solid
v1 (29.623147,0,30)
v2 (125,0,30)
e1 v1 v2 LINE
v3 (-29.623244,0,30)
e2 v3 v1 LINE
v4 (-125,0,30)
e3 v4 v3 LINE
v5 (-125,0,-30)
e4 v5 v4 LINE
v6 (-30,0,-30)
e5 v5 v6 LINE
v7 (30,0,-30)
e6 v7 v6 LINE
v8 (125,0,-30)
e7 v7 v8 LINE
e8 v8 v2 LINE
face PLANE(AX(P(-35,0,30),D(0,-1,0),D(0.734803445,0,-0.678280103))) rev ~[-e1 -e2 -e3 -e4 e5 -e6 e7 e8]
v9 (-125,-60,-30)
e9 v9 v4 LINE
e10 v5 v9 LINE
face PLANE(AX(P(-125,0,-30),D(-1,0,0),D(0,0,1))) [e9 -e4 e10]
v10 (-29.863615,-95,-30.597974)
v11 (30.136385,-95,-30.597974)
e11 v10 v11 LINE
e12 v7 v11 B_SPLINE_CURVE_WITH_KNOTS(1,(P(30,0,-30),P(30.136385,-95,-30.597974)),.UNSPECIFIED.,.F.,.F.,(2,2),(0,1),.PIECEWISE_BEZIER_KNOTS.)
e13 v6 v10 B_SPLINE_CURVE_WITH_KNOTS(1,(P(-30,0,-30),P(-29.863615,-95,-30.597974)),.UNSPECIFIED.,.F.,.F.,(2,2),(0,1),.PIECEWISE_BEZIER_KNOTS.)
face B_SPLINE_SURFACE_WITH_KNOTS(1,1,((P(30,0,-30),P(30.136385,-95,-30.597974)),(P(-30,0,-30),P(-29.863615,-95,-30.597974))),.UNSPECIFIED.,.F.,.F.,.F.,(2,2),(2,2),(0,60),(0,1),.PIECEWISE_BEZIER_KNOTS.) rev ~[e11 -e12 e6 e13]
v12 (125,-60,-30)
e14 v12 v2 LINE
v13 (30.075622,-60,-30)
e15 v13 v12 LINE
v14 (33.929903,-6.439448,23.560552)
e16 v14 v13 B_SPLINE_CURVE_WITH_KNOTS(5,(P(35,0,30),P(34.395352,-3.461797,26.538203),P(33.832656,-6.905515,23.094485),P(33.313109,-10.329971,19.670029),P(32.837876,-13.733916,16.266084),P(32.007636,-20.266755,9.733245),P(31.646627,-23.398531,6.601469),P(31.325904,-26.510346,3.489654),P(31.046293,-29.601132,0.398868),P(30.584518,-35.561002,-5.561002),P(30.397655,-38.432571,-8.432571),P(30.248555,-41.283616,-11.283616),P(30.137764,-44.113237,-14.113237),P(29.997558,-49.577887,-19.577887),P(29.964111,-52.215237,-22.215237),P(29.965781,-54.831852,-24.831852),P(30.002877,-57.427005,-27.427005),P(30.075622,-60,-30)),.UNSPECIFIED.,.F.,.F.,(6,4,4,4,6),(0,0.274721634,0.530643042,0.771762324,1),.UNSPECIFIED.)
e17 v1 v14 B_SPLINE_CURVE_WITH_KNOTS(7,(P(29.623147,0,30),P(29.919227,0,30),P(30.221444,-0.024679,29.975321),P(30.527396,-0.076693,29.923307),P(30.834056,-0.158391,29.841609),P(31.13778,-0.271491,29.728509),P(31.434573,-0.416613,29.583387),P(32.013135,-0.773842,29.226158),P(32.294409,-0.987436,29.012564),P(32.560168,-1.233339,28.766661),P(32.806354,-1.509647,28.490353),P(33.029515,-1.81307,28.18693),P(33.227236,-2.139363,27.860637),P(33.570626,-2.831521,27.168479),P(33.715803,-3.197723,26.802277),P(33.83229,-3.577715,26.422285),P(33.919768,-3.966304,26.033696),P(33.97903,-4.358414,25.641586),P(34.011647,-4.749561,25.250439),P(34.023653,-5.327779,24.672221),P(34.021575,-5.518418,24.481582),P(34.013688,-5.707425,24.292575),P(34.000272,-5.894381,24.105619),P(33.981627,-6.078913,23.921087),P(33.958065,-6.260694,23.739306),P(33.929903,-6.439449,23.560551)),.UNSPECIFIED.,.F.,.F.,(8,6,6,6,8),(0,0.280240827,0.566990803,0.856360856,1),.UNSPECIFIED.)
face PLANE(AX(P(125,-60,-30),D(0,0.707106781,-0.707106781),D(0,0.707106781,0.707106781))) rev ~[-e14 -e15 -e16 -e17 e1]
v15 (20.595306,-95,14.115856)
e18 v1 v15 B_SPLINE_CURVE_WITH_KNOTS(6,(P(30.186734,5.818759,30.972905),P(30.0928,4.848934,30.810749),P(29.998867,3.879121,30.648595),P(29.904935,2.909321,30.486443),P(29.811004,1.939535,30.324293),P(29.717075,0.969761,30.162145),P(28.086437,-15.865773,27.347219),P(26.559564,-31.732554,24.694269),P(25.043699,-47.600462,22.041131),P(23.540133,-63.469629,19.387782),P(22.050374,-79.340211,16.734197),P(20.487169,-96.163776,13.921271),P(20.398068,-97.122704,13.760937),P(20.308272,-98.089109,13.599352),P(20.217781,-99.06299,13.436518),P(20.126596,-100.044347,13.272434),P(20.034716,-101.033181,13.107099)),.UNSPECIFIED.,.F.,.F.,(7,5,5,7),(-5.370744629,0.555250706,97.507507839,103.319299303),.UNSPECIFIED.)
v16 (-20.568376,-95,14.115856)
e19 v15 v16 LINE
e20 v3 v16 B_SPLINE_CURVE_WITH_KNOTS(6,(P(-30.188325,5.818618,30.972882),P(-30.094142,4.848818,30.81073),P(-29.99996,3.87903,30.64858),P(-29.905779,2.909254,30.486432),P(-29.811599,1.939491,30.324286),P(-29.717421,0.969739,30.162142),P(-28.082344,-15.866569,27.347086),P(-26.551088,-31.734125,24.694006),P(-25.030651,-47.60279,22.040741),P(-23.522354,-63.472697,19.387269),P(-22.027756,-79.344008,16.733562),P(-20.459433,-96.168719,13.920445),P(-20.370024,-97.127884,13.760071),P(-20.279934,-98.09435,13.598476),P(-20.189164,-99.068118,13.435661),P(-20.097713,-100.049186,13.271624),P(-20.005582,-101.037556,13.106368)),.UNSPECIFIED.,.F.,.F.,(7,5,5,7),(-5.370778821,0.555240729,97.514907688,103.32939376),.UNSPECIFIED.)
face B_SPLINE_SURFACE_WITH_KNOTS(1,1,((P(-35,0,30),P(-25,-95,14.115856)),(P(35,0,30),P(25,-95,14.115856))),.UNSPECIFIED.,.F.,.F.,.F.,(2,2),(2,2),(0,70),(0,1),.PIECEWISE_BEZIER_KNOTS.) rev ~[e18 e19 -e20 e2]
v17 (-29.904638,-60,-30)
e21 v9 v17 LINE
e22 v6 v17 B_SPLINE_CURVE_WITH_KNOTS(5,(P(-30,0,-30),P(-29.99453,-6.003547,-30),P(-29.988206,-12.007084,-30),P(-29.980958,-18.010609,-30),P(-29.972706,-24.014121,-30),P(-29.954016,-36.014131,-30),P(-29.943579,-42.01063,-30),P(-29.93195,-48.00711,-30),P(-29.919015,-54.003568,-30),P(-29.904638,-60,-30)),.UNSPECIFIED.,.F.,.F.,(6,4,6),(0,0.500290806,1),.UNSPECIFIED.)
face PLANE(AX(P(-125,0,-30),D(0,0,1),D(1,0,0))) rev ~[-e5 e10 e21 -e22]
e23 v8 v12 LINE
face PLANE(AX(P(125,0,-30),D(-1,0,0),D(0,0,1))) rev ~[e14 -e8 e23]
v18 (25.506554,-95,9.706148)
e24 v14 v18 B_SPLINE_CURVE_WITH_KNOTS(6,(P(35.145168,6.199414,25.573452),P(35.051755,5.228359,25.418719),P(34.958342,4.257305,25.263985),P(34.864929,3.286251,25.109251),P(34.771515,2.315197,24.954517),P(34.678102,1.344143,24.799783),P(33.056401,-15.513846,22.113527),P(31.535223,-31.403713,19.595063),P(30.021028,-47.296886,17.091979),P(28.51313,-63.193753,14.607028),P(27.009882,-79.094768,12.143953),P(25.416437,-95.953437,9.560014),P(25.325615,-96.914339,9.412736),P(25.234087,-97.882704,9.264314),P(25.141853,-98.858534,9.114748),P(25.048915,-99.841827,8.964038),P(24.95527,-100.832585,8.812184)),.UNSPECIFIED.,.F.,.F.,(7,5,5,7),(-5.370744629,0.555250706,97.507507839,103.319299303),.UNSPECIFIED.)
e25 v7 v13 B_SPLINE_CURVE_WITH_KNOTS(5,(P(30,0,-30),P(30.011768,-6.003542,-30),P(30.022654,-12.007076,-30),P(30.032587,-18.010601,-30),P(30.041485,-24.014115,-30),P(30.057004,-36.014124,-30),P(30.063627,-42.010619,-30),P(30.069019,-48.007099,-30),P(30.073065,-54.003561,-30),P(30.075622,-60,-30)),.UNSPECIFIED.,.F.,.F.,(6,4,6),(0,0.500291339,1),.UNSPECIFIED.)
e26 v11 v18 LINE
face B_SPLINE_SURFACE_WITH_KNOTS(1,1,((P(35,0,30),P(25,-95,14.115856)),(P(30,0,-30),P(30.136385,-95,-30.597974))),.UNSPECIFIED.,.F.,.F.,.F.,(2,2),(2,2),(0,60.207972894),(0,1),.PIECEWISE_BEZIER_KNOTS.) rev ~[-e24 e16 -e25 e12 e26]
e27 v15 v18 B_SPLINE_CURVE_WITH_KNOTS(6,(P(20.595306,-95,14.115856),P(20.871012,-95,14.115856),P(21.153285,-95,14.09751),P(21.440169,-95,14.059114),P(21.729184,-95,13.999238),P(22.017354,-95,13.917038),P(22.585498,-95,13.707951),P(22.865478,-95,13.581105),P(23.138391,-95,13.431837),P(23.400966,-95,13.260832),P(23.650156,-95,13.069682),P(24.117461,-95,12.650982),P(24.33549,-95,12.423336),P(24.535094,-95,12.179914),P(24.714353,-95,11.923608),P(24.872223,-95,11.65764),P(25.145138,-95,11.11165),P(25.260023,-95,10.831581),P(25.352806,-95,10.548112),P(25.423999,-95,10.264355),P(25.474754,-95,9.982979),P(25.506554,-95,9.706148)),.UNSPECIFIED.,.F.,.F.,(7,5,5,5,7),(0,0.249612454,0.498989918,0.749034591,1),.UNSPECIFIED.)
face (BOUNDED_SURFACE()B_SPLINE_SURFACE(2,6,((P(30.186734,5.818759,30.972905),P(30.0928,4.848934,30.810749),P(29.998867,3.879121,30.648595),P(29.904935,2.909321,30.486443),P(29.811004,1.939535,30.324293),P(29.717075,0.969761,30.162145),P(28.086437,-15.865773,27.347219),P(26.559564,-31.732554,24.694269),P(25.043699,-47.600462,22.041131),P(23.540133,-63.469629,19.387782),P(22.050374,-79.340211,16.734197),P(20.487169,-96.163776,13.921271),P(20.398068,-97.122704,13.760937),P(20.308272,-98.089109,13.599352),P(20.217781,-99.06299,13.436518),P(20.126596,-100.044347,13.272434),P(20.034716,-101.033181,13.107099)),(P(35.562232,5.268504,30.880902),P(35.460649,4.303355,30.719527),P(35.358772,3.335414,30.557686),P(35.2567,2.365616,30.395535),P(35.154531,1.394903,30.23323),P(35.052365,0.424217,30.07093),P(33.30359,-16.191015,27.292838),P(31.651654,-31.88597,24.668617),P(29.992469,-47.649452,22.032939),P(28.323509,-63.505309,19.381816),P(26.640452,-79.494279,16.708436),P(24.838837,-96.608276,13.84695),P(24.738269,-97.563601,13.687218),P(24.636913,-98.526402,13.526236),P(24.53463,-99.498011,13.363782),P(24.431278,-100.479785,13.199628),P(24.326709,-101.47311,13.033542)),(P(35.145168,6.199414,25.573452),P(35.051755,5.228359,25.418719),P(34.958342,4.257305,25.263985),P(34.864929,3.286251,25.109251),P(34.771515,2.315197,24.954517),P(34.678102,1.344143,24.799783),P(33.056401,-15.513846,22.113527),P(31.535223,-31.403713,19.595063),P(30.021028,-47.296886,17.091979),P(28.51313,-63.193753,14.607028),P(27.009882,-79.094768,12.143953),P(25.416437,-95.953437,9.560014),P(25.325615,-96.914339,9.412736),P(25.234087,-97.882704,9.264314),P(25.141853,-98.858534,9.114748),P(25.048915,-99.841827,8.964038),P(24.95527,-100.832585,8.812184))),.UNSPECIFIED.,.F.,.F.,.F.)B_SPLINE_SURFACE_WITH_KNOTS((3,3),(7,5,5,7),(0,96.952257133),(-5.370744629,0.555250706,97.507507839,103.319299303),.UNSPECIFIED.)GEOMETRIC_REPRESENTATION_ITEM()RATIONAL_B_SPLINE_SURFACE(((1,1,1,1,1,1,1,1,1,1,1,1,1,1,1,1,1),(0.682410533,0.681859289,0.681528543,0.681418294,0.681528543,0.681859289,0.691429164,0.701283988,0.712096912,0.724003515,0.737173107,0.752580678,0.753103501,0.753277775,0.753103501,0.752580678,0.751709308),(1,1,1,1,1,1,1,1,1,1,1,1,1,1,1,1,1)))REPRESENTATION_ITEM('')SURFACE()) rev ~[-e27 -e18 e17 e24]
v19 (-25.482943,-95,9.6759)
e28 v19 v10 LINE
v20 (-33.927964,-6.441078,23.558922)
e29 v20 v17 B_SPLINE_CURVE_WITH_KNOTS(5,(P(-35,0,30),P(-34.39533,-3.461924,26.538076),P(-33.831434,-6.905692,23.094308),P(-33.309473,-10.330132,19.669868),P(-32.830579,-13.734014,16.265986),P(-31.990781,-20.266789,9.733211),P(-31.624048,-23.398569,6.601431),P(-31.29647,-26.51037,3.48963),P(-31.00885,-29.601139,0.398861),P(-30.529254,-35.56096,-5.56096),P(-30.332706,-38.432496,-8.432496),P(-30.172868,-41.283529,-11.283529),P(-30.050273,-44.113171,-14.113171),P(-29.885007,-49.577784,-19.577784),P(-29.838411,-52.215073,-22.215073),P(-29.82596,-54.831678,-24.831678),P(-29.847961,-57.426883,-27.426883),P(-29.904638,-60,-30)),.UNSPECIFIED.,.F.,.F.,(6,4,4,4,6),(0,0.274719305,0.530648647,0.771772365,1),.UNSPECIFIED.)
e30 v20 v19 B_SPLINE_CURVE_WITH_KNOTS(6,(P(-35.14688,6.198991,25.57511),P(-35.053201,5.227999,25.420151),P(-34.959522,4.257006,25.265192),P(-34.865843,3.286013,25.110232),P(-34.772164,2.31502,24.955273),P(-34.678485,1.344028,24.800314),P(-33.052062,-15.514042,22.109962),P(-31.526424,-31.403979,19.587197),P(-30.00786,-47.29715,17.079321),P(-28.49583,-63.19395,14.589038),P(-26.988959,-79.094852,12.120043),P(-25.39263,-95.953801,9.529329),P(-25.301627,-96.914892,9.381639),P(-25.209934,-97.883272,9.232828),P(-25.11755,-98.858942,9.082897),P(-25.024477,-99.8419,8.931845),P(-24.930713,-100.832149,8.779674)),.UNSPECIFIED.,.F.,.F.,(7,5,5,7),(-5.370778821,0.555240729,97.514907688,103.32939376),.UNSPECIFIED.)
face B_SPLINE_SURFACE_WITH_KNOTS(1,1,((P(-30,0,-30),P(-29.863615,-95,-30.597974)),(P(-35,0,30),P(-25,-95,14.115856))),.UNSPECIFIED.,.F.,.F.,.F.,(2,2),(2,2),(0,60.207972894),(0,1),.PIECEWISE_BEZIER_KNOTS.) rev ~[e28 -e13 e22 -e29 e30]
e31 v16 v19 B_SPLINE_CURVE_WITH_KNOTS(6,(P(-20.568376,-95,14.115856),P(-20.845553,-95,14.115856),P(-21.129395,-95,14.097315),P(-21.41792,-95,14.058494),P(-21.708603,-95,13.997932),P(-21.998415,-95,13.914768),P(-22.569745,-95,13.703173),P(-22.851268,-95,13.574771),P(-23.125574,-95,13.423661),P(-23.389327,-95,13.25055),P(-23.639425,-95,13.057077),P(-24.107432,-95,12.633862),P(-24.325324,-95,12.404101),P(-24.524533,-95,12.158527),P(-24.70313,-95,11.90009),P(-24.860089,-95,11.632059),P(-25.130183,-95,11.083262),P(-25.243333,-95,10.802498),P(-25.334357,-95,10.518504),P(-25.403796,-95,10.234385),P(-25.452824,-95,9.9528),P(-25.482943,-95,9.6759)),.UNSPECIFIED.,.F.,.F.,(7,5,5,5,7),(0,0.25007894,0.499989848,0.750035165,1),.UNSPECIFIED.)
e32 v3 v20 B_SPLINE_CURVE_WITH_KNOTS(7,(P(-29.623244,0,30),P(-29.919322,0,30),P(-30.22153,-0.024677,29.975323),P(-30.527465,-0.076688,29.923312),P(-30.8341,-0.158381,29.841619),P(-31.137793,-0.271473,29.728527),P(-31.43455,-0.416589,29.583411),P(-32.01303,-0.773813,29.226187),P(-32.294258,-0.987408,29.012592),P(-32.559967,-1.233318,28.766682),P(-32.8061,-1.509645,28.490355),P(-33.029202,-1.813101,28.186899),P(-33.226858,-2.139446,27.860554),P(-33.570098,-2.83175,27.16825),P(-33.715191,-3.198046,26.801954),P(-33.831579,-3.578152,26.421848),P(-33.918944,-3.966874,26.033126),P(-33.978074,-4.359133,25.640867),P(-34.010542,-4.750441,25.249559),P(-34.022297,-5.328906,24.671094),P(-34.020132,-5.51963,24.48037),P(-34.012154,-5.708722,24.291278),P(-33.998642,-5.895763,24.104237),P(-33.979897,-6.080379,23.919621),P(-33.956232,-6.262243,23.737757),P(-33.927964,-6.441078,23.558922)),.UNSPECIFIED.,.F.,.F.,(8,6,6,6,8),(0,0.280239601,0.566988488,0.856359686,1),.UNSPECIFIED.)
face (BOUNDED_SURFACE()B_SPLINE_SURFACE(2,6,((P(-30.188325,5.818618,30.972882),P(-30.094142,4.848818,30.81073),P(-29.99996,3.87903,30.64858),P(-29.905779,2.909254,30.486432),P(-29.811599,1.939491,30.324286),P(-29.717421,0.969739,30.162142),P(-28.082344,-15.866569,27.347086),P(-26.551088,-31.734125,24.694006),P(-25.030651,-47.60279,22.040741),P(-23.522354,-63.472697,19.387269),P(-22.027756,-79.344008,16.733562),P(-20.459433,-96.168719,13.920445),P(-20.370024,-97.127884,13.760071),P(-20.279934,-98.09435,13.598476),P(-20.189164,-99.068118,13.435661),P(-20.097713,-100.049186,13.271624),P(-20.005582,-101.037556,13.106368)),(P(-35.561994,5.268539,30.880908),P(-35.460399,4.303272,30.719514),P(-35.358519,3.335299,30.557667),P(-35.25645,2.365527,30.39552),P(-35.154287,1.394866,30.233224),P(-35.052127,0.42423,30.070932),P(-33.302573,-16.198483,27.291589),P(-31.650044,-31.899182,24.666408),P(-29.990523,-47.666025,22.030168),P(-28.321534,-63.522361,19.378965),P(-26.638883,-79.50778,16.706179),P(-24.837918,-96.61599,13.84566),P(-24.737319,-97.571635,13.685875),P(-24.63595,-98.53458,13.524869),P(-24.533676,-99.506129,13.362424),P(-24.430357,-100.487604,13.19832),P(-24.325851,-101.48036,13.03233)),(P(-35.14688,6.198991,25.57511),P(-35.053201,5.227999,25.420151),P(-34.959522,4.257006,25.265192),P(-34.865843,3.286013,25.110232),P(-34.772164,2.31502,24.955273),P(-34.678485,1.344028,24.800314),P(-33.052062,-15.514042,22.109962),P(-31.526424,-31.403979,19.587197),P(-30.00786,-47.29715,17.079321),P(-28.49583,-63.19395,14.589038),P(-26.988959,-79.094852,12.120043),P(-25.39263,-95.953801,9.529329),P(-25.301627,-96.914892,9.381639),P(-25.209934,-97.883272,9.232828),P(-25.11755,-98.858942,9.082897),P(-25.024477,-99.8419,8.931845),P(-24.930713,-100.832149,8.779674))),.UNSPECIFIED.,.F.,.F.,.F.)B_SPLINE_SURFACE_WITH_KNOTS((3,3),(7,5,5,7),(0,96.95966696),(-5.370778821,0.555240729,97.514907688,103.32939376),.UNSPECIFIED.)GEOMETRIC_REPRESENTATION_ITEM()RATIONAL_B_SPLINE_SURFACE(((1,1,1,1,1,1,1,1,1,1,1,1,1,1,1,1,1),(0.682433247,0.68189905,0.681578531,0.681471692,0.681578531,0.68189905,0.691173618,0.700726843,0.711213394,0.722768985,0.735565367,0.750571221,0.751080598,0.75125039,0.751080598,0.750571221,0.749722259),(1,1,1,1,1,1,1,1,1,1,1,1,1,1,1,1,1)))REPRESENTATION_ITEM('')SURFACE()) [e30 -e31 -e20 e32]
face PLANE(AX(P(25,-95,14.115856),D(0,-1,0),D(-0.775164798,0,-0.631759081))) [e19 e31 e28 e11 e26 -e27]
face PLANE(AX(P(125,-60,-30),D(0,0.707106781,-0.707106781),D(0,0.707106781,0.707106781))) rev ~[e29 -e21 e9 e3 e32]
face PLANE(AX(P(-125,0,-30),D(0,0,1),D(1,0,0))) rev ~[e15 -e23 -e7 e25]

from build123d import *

# Parameters (mm, degrees)
F0_W     = 250
F0_H     = 60
F1_DEPTH = 60
F3_DEPTH = 250
F8_R     = 5


with BuildPart() as f1:
    # F0 (on Front) → F1 (new body)
    with BuildSketch(Plane.XZ):
        Rectangle(F0_W, F0_H)
    extrude(amount=F1_DEPTH)

    # F2 (on face) → F3 (cut)
    with BuildSketch(Plane.YZ.offset(125)):
        Polygon((-60, -30), (0, 30), (-60, 30), align=None)
    extrude(amount=-F3_DEPTH, mode=Mode.SUBTRACT)

    # F4 (on face) → F7 section 0
    with BuildSketch(Plane(origin=(0, 0, 0), x_dir=(-1, 0, 0), z_dir=(0, 1, 0))):
        Polygon((35, 30), (-35, 30), (-30, -30), (30, -30), align=None)
    # F6 (on offset) → F7 section 1
    with BuildSketch(Plane.XZ.offset(95)):
        Polygon((25, 14.1158560291), (-25, 14.1158560291), (-29.863614589, -30.5979736149), (30.136385411, -30.5979736149), align=None)
    loft()

    # F8
    f8_edges = [f1.edges().sort_by_distance(p)[0] for p in [
        (30, -47.5, 22.057928),
        (-30, -47.5, 22.057928),
    ]]
    fillet(f8_edges, radius=F8_R)


solid = f1.part
